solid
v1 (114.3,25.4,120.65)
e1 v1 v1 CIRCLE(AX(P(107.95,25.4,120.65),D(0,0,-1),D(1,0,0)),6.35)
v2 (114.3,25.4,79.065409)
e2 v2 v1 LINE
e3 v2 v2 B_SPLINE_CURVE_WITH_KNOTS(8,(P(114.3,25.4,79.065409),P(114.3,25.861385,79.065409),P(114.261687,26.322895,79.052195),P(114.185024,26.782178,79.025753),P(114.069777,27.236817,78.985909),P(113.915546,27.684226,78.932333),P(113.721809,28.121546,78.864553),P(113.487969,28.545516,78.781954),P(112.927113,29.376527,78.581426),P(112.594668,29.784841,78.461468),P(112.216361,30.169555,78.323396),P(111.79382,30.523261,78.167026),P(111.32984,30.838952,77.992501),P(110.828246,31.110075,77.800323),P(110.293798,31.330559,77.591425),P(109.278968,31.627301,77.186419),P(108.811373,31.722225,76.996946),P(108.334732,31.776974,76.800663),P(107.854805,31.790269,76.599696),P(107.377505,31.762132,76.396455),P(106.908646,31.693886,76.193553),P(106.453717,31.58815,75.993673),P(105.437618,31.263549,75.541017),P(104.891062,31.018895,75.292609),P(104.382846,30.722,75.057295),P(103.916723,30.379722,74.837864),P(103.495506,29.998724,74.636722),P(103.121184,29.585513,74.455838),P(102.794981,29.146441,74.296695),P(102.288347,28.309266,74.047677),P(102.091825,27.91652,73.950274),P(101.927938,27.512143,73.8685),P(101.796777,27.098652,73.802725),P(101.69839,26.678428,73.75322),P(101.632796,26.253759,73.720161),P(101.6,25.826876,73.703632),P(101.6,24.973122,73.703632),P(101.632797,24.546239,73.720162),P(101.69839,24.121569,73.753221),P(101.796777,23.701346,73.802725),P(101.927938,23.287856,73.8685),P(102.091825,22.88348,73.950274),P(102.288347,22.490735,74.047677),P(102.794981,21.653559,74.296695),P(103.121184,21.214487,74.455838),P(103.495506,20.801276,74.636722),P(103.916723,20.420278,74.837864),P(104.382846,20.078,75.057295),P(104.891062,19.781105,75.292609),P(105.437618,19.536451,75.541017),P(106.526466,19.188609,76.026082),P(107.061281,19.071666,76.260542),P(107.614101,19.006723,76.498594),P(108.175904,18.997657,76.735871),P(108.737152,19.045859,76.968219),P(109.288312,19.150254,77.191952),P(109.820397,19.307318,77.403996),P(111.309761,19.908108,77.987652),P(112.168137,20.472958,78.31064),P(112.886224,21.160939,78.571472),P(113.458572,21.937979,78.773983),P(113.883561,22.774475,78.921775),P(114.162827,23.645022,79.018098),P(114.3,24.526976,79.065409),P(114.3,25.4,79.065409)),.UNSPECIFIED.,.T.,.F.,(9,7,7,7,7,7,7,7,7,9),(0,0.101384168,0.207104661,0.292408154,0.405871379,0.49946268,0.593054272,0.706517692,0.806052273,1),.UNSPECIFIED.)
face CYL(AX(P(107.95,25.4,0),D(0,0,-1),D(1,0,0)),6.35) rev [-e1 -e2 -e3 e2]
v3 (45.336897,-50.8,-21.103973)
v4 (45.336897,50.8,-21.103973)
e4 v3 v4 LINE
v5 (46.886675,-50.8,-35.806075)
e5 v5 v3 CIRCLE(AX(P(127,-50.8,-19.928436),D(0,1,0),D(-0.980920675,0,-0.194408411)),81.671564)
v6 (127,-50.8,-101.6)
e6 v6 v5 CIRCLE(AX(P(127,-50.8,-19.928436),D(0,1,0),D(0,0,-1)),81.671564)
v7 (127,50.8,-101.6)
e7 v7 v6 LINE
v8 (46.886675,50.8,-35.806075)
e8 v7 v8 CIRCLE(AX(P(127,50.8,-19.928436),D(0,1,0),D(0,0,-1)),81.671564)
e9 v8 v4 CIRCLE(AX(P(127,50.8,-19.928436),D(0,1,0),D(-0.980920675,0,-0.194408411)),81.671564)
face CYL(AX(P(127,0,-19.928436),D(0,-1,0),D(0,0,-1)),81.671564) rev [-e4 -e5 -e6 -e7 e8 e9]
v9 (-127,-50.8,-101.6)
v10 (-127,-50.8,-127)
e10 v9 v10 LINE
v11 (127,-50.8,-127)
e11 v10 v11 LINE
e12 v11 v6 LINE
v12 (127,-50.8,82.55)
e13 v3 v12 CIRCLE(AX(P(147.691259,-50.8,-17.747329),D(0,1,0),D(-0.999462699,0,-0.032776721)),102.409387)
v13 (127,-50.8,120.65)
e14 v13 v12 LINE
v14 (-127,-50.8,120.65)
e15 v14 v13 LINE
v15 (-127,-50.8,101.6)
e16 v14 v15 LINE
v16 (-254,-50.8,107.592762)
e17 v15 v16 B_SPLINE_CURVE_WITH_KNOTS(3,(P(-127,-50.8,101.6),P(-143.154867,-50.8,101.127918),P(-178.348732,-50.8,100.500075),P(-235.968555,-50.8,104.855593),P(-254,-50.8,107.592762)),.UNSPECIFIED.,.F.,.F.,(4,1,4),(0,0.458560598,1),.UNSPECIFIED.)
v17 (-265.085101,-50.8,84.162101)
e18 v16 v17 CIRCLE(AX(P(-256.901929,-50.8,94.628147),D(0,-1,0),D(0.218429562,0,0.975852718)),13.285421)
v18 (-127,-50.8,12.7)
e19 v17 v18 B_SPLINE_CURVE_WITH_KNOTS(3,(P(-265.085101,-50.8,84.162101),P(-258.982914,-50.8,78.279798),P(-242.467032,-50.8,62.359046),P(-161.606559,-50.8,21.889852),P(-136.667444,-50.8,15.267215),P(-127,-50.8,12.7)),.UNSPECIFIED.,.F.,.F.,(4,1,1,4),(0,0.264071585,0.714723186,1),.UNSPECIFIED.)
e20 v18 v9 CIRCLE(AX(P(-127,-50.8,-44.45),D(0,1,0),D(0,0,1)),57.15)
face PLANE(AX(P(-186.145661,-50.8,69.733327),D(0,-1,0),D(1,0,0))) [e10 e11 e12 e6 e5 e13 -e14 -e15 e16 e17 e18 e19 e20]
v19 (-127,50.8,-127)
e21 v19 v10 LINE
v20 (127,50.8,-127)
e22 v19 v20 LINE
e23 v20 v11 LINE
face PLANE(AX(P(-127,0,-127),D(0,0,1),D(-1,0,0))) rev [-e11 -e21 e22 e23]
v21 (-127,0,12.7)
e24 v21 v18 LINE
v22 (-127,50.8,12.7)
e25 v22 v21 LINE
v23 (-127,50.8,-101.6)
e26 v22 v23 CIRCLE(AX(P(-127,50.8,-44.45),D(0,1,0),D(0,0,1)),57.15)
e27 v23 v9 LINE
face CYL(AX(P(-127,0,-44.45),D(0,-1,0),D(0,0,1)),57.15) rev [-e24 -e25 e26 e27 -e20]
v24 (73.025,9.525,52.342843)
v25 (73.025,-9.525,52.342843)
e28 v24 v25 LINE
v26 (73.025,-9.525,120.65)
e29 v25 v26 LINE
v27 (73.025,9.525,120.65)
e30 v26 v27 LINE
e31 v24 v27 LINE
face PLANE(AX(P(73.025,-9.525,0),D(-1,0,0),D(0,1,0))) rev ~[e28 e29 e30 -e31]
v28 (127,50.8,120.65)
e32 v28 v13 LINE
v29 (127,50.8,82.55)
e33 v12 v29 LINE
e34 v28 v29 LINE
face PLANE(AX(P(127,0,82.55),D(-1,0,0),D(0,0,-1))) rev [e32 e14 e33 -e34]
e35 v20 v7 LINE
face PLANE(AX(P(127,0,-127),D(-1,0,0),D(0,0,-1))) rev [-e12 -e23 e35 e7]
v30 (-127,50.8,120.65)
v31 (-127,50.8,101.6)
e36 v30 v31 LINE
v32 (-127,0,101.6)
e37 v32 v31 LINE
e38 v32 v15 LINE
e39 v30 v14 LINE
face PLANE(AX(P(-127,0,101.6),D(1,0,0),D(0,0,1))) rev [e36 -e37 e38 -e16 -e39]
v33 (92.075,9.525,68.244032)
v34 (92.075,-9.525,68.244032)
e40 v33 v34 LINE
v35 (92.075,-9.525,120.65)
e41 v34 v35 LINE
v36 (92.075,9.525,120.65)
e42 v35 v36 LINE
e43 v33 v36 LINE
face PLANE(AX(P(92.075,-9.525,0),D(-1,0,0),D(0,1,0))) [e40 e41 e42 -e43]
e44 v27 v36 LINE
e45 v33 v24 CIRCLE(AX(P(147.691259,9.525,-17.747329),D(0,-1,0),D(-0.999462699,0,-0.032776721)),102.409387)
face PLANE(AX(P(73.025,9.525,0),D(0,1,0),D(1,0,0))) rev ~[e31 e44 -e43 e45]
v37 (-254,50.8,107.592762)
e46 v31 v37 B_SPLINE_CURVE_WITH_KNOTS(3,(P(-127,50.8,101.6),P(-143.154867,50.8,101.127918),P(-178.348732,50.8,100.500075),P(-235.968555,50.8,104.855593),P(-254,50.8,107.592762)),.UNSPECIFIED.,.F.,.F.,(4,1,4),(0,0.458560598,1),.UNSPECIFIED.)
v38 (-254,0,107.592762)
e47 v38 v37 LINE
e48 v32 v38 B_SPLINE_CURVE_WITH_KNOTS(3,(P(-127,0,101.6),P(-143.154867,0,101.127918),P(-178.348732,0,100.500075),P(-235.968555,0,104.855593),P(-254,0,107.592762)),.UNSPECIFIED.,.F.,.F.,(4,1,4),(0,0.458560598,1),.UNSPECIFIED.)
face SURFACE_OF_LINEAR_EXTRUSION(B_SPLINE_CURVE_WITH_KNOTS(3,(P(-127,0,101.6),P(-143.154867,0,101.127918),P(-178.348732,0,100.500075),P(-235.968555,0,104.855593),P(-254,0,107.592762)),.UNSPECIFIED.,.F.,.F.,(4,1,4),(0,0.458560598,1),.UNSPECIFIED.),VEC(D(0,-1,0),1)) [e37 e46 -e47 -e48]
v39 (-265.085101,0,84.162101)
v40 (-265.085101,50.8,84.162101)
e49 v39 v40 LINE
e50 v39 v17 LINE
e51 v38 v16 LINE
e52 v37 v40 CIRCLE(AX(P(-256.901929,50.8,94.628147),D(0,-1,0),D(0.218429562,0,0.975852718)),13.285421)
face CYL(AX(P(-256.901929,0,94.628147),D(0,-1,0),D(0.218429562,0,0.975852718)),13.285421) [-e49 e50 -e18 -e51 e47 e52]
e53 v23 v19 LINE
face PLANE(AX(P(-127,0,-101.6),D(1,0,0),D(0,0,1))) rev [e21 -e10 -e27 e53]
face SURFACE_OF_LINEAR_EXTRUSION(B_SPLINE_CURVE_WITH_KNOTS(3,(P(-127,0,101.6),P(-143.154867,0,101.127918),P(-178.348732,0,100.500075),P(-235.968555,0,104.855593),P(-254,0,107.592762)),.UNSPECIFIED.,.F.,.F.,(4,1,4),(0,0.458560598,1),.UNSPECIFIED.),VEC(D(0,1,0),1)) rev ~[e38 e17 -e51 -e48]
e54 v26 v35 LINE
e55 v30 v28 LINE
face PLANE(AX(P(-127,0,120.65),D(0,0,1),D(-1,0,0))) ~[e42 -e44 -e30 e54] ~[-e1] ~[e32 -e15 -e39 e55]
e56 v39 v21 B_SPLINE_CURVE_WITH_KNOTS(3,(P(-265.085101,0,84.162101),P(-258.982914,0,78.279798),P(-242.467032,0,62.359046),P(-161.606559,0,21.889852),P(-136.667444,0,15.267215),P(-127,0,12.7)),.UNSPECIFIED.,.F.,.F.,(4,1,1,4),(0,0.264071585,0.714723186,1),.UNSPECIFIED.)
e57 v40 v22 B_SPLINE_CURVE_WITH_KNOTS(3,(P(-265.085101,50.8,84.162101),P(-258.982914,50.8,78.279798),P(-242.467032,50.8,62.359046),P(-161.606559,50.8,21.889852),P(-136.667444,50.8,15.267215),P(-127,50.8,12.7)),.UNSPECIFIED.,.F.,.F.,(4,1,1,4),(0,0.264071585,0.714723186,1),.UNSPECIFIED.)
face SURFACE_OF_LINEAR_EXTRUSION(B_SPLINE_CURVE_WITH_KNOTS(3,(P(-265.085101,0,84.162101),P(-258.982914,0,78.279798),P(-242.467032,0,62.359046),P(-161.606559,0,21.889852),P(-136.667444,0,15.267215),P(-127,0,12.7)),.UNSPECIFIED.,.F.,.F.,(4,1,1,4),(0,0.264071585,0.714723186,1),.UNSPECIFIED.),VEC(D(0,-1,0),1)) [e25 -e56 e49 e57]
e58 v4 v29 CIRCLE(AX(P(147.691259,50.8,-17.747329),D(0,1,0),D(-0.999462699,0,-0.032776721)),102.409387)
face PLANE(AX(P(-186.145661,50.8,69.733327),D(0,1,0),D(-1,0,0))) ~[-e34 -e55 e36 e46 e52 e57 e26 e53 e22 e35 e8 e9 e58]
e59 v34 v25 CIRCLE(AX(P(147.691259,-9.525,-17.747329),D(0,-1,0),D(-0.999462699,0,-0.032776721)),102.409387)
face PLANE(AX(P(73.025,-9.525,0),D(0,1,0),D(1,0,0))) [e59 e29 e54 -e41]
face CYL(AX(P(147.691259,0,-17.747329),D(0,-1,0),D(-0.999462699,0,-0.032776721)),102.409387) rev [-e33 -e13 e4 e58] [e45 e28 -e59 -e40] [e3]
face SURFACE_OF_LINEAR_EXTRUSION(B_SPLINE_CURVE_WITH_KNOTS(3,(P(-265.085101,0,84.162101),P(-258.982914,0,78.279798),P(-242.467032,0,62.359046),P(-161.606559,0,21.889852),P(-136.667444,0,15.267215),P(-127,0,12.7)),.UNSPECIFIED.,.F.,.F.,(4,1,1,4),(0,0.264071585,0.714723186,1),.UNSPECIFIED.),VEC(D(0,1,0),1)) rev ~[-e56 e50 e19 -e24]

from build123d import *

# Parameters (mm, degrees)
F0_W     = 254
F0_H     = 19.05
F1_DEPTH = 50.8
F2_DEPTH = 50.8
F4_W     = 19.05
F4_H     = 19.05
F4_R     = 6.35
F5_DEPTH = 127
F7_DEPTH = 50.8


# Not quite as in the source:
# - a feature names something its author has since deleted; it is built from what else it names


with BuildPart() as f1:
    # F0 (on Front) → F1 (new body)
    with BuildSketch(Plane.XZ):
        with Locations((0, 111.1250000177)):
            Rectangle(F0_W, F0_H)
    extrude(amount=F1_DEPTH)

    # F0 (on Front) → F2 (join, through all)
    with BuildSketch(Plane.XZ):
        with BuildLine():
            Line((127, 82.5500000177), (127, 101.6000000177))
            Line((127, 101.6000000177), (-127, 101.6000000177))
            Line((-127, 101.6000000177), (-127, 12.7000000177))
            ThreePointArc((-127, 12.7000000177), (-69.8499999823, -44.45), (-127, -101.6000000177))
            Line((-127, -101.6000000177), (-127, -127.0000000177))
            Line((-127, -127.0000000177), (-101.6, -127.0000000177))
            Line((-101.6, -127.0000000177), (88.9, -127.0000000177))
            Line((88.9, -127.0000000177), (127, -127.0000000177))
            Line((127, -127.0000000177), (127, -101.6000000177))
            ThreePointArc((127, -101.6000000177), (75.1661658016, -83.0433945651), (46.8866745136, -35.8060751437))
            ThreePointArc((46.8866745136, -35.8060751437), (45.7784438509, -28.4901624232), (45.3368966297, -21.1039732713))
            ThreePointArc((45.3368966297, -21.1039732713), (67.248156143, 45.6292415321), (127, 82.5500000177))
        make_face()
    extrude(amount=F2_DEPTH)

    # F3: F1 across face


with BuildPart() as f1_1:
    add(f1.part)
    add(f1.part.mirror(Plane(origin=(-11.712184673, 0, 3.7973817679), x_dir=(1, 0, 0), z_dir=(0, 1, 0))))

    # F4 (on Top) → F5 (cut)
    with BuildSketch(Plane.XY):
        with Locations((82.55, 0)):
            Rectangle(F4_W, F4_H)
        with Locations((107.95, 25.4)):
            Circle(F4_R)
    extrude(amount=F5_DEPTH, mode=Mode.SUBTRACT)



with BuildPart() as f7:
    # F0 (on Front) → F7 (new body)
    with BuildSketch(Plane.XZ):
        with BuildLine():
            Line((-127, 12.7000000177), (-127, 101.6000000177))
            add(Edge.make_bspline(
                [(-127, 101.6000000177), (-143.1548670141, 101.1279175586), (-178.3487321582, 100.5000750149), (-235.9685551739, 104.8555928403), (-254, 107.5927615166)],
                knots=[0, 0, 0, 0, 0.4585605976, 1, 1, 1, 1], degree=3))
            ThreePointArc((-254, 107.5927615166), (-268.9111687536, 100.3097468732), (-265.0851011276, 84.1621011496))
            add(Edge.make_bspline(
                [(-265.0851011276, 84.1621011496), (-258.982913814, 78.2797981737), (-242.4670319791, 62.3590460812), (-161.6065585576, 21.8898515634), (-136.6674442933, 15.2672145631), (-127, 12.7000000177)],
                knots=[0, 0, 0, 0, 0.2640715847, 0.7147231864, 1, 1, 1, 1], degree=3))
        make_face()
    extrude(amount=F7_DEPTH)


with BuildPart() as f1_2:
    add(f1_1.part)

    add(f7.part)  # F6 merges F7
    # F6: F7 across plane
    add(f7.part.mirror(Plane.XZ))


solid = f1_2.part
